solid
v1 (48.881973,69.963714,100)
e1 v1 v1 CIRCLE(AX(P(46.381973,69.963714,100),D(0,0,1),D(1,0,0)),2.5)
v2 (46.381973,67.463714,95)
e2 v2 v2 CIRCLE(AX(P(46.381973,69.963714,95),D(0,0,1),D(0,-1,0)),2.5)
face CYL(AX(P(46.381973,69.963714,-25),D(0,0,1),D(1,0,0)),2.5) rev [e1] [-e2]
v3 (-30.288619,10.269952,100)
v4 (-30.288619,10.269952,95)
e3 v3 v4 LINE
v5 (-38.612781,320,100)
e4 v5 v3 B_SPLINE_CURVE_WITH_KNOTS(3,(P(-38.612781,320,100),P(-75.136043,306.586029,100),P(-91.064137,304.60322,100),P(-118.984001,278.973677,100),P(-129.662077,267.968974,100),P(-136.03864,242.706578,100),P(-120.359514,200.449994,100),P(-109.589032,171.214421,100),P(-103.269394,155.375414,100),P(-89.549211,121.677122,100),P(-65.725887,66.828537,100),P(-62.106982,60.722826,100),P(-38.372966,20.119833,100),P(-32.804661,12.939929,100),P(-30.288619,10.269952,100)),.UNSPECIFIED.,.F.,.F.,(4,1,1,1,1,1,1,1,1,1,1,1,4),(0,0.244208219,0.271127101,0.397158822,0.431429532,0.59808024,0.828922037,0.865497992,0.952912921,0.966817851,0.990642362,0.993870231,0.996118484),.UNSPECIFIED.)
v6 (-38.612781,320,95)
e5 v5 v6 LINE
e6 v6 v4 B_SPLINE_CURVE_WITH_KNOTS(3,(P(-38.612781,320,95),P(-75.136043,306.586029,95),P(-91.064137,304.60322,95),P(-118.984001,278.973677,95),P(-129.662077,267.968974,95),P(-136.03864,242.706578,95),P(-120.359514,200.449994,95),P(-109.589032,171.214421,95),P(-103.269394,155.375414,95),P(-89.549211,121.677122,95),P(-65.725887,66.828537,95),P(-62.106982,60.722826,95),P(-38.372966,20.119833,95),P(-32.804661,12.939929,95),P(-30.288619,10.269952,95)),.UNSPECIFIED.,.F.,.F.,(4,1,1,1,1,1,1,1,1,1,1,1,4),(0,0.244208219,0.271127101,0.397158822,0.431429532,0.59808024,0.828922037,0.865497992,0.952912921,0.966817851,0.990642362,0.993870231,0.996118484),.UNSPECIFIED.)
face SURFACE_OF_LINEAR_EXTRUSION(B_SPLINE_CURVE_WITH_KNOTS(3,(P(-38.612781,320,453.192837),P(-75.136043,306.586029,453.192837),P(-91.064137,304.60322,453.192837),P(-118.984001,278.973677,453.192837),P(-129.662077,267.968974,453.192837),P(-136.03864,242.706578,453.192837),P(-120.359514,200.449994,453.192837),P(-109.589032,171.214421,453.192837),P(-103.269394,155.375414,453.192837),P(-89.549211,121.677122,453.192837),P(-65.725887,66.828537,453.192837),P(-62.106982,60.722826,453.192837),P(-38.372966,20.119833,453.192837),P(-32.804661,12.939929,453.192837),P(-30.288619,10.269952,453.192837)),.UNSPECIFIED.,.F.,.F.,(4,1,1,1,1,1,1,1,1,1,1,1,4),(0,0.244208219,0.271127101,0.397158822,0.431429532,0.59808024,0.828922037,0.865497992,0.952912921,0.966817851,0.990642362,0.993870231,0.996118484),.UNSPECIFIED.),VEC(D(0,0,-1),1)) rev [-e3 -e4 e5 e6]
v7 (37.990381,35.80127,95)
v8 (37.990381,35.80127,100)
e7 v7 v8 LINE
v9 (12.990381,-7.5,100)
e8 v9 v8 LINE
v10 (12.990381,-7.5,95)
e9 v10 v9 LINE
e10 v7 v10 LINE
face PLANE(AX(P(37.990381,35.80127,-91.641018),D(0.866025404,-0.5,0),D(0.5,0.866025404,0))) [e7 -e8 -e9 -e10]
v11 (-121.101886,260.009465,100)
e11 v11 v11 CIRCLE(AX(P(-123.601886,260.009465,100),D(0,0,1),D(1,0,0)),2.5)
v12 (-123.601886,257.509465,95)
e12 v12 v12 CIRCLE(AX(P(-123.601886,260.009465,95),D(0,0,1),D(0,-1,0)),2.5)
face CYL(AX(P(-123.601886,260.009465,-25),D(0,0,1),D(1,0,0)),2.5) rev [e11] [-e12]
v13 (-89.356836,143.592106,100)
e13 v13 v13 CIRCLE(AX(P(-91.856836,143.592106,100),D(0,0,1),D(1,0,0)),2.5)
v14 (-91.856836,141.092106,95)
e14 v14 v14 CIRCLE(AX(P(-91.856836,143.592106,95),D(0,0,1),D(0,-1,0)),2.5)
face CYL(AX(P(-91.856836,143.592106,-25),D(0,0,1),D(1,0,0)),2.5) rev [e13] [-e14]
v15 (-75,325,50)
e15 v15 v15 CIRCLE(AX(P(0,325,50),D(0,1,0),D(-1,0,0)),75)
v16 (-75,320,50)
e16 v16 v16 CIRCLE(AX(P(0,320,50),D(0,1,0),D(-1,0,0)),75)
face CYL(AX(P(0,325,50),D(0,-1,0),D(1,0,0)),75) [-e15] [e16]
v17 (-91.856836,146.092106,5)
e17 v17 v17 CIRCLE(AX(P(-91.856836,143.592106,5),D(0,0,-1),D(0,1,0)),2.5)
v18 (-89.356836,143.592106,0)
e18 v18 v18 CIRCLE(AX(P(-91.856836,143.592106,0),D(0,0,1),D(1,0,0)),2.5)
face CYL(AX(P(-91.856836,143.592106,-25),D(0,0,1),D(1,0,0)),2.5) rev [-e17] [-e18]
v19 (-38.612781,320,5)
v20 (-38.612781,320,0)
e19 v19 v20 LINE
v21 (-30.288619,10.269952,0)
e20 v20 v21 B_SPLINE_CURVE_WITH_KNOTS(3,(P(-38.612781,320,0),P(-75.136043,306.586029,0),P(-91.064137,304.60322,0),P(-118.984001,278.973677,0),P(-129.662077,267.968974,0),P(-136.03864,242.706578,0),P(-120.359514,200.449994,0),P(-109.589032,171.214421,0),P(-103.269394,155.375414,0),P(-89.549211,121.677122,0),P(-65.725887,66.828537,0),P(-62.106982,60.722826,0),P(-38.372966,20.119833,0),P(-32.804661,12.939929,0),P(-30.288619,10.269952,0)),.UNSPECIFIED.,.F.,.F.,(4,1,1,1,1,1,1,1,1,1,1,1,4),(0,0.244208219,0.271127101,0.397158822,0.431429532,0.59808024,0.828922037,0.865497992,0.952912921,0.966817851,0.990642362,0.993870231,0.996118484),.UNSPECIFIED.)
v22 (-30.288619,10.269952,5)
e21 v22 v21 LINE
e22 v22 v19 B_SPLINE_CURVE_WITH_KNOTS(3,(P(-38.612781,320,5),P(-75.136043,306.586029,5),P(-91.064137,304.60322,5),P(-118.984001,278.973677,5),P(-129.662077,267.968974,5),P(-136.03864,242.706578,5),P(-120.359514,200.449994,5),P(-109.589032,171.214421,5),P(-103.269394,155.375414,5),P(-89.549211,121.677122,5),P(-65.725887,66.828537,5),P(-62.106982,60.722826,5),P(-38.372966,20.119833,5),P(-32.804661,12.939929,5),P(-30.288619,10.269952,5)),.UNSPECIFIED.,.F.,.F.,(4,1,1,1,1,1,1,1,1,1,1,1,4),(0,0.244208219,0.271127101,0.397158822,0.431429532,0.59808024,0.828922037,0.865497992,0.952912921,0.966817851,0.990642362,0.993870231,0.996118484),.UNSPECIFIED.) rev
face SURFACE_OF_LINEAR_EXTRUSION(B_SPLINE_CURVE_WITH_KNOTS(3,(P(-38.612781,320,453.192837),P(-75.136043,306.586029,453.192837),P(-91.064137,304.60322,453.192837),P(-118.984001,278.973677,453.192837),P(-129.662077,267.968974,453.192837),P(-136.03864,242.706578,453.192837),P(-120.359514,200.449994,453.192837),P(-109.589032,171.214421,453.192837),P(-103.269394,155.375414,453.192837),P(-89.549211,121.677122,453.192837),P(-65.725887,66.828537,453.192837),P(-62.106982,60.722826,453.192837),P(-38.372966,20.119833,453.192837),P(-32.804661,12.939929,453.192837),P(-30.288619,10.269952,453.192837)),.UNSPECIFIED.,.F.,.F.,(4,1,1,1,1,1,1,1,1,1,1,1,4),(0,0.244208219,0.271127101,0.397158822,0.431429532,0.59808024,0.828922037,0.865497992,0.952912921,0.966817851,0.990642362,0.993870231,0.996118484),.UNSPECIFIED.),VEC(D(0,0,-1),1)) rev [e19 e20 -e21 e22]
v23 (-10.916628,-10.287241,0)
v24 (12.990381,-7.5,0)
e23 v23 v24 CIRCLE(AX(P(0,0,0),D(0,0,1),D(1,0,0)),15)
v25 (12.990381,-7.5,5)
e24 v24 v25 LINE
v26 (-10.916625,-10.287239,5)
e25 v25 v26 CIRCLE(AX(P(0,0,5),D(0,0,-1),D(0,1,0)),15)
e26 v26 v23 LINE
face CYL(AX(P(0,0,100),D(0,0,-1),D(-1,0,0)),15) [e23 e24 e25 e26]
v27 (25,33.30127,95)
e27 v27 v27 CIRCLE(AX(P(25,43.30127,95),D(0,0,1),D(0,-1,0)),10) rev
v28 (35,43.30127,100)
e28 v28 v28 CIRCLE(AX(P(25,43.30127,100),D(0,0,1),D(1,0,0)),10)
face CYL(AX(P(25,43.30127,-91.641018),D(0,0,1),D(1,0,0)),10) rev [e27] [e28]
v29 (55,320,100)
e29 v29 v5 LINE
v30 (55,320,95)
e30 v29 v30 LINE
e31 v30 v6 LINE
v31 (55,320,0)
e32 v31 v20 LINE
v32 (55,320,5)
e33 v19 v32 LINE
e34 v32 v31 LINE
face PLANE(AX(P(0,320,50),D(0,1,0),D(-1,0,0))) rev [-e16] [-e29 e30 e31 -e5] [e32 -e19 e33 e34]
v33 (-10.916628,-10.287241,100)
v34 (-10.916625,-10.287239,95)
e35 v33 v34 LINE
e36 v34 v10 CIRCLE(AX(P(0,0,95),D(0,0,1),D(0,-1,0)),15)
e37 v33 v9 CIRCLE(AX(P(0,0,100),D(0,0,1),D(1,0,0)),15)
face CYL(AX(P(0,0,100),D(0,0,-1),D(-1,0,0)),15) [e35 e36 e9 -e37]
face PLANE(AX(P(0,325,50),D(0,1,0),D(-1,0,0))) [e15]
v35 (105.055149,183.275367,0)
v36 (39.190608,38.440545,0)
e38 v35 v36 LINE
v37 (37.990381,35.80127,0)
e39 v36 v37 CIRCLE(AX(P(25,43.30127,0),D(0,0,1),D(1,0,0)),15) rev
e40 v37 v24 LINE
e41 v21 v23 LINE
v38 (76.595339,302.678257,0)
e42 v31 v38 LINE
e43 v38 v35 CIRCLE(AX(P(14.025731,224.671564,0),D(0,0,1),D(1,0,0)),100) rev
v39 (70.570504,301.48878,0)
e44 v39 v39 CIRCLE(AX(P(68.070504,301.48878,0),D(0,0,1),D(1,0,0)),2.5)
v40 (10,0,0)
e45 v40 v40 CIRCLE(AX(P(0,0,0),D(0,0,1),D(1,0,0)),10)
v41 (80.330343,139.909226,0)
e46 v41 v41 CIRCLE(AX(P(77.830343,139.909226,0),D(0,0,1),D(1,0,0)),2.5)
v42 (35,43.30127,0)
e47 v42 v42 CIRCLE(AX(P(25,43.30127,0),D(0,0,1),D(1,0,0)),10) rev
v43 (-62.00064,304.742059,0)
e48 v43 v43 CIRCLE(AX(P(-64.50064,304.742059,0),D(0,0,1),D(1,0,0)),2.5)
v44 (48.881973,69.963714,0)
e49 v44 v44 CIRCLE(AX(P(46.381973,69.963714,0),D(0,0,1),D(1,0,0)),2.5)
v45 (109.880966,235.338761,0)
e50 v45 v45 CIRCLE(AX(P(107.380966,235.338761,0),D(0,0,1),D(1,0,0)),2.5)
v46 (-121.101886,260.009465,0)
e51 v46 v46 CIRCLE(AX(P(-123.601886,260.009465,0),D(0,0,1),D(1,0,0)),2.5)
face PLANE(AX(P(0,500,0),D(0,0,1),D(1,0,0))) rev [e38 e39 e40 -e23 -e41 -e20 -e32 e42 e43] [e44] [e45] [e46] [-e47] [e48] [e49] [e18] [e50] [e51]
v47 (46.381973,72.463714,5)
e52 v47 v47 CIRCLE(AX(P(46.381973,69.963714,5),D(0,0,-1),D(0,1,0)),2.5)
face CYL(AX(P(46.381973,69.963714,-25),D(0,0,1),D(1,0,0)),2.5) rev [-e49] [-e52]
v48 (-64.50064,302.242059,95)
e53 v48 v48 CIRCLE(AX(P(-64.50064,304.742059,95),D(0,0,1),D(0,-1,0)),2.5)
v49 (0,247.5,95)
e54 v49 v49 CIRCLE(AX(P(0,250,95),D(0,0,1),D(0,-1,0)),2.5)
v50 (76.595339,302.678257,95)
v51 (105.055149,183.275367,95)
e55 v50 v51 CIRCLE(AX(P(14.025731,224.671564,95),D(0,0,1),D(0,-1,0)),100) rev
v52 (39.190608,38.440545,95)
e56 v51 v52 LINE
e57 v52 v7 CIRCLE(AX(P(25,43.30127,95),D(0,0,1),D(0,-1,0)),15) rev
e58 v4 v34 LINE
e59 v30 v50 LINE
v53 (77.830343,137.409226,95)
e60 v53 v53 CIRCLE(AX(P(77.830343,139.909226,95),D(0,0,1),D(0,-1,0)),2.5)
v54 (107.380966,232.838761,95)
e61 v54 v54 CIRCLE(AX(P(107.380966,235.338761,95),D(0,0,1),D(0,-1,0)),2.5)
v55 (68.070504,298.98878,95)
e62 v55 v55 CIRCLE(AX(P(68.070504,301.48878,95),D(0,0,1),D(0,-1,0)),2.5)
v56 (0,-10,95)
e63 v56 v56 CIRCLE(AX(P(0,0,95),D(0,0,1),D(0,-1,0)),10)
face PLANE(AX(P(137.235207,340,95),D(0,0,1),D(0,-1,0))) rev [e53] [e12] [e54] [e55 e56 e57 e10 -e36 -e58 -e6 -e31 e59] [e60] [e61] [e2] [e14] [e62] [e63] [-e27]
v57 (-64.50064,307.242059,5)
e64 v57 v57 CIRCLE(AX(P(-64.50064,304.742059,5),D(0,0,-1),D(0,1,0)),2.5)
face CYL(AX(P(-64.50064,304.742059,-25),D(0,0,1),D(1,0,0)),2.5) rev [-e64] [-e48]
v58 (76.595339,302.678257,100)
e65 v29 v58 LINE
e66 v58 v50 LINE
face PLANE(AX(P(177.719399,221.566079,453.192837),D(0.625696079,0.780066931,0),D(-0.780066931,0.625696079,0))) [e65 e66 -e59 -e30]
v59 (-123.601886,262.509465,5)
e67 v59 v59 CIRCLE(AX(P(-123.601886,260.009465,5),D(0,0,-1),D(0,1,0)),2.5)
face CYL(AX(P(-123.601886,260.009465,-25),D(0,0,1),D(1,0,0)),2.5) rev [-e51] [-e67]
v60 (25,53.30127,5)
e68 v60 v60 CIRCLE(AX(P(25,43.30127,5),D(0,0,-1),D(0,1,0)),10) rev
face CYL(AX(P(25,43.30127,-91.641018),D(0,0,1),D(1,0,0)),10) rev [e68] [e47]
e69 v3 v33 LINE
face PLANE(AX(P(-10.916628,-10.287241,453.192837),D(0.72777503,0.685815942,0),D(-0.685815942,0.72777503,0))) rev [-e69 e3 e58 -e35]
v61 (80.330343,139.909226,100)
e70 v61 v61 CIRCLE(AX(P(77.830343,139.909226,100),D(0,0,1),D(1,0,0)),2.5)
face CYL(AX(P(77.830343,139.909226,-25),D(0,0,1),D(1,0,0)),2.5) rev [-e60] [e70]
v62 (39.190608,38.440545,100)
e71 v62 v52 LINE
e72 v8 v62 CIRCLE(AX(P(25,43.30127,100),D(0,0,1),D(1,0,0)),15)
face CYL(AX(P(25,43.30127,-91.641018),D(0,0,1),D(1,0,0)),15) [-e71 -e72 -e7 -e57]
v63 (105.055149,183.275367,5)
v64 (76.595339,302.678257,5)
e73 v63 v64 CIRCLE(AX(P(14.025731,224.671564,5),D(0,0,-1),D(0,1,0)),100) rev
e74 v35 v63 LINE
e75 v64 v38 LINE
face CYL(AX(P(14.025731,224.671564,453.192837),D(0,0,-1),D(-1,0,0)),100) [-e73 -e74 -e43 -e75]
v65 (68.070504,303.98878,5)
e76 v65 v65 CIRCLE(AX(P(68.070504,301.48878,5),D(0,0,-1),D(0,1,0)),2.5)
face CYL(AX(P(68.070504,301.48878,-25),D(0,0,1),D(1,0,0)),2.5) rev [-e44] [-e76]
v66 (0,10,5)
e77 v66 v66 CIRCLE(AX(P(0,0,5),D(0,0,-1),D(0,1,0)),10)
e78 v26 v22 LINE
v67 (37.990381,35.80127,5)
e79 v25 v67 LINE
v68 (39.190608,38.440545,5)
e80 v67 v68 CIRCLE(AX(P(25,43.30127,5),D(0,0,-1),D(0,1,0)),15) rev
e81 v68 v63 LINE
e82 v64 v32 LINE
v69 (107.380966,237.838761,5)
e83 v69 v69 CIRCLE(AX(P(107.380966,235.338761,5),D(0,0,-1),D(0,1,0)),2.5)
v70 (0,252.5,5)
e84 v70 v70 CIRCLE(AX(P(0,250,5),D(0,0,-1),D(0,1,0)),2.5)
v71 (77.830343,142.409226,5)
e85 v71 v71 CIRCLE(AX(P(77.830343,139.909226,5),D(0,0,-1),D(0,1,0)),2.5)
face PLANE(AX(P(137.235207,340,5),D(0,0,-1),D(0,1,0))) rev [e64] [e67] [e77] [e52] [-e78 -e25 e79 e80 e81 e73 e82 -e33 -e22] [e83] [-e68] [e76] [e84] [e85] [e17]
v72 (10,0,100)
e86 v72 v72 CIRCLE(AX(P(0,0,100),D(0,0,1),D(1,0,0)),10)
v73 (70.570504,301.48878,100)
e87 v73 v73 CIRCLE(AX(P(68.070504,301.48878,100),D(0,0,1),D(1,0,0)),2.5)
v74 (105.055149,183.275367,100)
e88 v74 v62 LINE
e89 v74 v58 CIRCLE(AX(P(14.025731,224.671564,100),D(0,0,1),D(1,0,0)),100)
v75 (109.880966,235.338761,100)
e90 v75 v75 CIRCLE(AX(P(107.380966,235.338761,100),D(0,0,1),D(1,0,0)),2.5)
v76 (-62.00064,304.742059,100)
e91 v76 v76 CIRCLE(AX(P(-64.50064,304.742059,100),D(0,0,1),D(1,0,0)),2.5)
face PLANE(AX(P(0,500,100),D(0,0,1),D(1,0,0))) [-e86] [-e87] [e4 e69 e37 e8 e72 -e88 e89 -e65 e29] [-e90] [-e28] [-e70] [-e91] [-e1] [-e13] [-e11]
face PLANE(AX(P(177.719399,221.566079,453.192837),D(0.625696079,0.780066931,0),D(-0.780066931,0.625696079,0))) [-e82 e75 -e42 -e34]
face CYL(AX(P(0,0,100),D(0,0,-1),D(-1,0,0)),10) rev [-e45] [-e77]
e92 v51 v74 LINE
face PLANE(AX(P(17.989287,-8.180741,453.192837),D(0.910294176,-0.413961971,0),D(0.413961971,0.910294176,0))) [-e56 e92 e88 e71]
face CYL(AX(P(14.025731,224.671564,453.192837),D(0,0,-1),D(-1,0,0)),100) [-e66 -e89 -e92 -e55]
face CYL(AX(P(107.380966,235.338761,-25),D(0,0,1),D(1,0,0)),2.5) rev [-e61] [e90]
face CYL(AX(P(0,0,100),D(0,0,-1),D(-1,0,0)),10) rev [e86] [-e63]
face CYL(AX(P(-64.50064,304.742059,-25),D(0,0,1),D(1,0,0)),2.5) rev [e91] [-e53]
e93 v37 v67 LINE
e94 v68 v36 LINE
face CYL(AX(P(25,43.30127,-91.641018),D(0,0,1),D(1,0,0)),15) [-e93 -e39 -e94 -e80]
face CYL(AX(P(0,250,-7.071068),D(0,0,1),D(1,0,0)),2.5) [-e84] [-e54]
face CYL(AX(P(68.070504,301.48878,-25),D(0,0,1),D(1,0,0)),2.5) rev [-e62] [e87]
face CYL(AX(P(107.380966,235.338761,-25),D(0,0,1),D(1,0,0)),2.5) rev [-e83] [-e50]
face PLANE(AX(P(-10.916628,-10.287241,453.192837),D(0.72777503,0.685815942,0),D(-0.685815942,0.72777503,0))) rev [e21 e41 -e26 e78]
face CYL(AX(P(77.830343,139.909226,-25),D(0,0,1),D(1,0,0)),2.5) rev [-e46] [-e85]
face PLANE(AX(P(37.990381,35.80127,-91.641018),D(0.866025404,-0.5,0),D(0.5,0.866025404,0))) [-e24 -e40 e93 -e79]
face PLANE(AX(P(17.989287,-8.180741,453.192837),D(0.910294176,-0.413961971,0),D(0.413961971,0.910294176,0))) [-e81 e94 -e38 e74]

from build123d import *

# Parameters (mm, degrees)
SKETCH_1_R               = 10
EXTRUDE_1_DEPTH          = 100
EXTRUDE_START            = -100
SKETCH_2_R               = 10
EXTRUDE_2_DEPTH          = 100
EXTRUDE_6_DEPTH          = 100
CUT_EXTRUDE_1_DEPTH      = 547.260522505
CUT_EXTRUDE_1_DEPTH_BACK = 547.260522505
SKETCH_3_W               = 90
SKETCH_3_H               = 380
SKETCH_5_R               = 2.5
EXTRUDE_3_DEPTH          = 100
SKETCH_6_W               = 191.177045066
SKETCH_6_H               = 235.084722287
CUT_EXTRUDE_2_DEPTH      = 84
SKETCH_7_R               = 75
EXTRUDE_4_DEPTH          = 5
FILLET_1_R               = 100
CUT_EXTRUDE_3_DEPTH      = 372.245990354
CUT_EXTRUDE_3_DEPTH_BACK = 372.245990354
SKETCH_9_R               = 2.5


# Read off the part's stored shape, not the designer's step: 凸台-拉伸6
with BuildPart() as part:
    # 草图1 → 凸台-拉伸1 (new body)
    with BuildSketch(Plane.XY):
        with BuildLine():
            Line((-15, 500), (-15, 0))
            ThreePointArc((-15, 0), (0, -15), (15, 0))
            Line((15, 0), (15, 500))
            ThreePointArc((15, 500), (0, 515), (-15, 500))
        make_face()
        with Locations((0, 500)):
            Circle(SKETCH_1_R, mode=Mode.SUBTRACT)
        Circle(SKETCH_1_R, mode=Mode.SUBTRACT)
    extrude(amount=EXTRUDE_1_DEPTH)

    # 草图2 → 凸台-拉伸2 (add)
    with BuildSketch(Plane.XY.offset(100).offset(EXTRUDE_START)):
        with BuildLine():
            Line((15, 58.301270189), (25, 58.301270189))
            ThreePointArc((25, 58.301270189), (37.990381057, 50.801270189), (37.990381057, 35.801270189))
            Line((37.990381057, 35.801270189), (12.990381057, -7.5))
            ThreePointArc((12.990381057, -7.5), (-3.882285677, -14.488887394), (-15, 0))
            Line((-15, 0), (-15, 58.301270189))
            Line((-15, 58.301270189), (15, 58.301270189))
        make_face()
        with Locations((25, 43.301270189)):
            Circle(SKETCH_2_R, mode=Mode.SUBTRACT)
        Circle(SKETCH_2_R, mode=Mode.SUBTRACT)
    extrude(amount=EXTRUDE_2_DEPTH)

    # 凸台-拉伸6 outline → 凸台-拉伸6 (add)
    with BuildSketch(Plane(origin=(0, 0, 0), x_dir=(-1, 0, 0), z_dir=(0, 0, -1)).offset(EXTRUDE_START)):
        with BuildLine():
            add(Edge.make_bspline(
                [(38.612780637, 320), (75.136043423, 306.586029444), (91.064136582, 304.603219665), (118.984001014, 278.973676733), (129.662077412, 267.968974065), (136.038640467, 242.70657755), (120.359514298, 200.44999402), (109.589031887, 171.214421453), (103.269394168, 155.375414082), (89.549210595, 121.677121722), (65.725886592, 66.828536865), (62.106981873, 60.722826423), (38.372965569, 20.119833015), (32.80466093, 12.939929061), (30.288618585, 10.269952061)],
                knots=[0, 0, 0, 0, 0.244208219, 0.271127101, 0.397158822, 0.431429532, 0.59808024, 0.828922037, 0.865497992, 0.952912921, 0.966817851, 0.990642362, 0.993870231, 0.996118484, 0.996118484, 0.996118484, 0.996118484], degree=3))
            Line((38.612780637, 320), (15, 320))
            Line((15, 320), (15, 0))
            ThreePointArc((15, 0), (13.941832406, -5.534013839), (10.916625444, -10.28723913))
            Line((10.916625444, -10.28723913), (30.288618585, 10.269952061))
        make_face()
        with BuildLine():
            Line((-15, 58.301270189), (-15, 320))
            Line((-15, 320), (-55, 320))
            Line((-55, 320), (-137.235207142, 254.038677195))
            Line((-137.235207142, 254.038677195), (-39.190607966, 38.440545392))
            ThreePointArc((-39.190607966, 38.440545392), (-37.204730066, 52.021623624), (-25, 58.301270189))
            Line((-25, 58.301270189), (-15, 58.301270189))
        make_face()
    extrude(amount=EXTRUDE_6_DEPTH)

    # 草图3 → 切除-拉伸1 (cut, two sides: drawn at the far end of the back side and taken through both)
    with BuildSketch(Plane.ZY.offset(15).offset(-CUT_EXTRUDE_1_DEPTH_BACK)):
        with Locations((50, 150)):
            Rectangle(SKETCH_3_W, SKETCH_3_H)
    extrude(amount=CUT_EXTRUDE_1_DEPTH + CUT_EXTRUDE_1_DEPTH_BACK, mode=Mode.SUBTRACT)

    # 草图5 → 凸台-拉伸3 (add)
    with BuildSketch(Plane.XY.offset(100)):
        with Locations(Location((0, 250, 0), (0, 0, 270))):
            Circle(SKETCH_5_R)
    extrude(amount=-EXTRUDE_3_DEPTH)

    # 草图6 → 切除-拉伸2 (cut)
    with BuildSketch(Plane(origin=(15, 0, 0), x_dir=(0, 0, -1), z_dir=(1, 0, 0))):
        with Locations((-50.962374235, 437.542361144)):
            Rectangle(SKETCH_6_W, SKETCH_6_H)
    extrude(amount=-CUT_EXTRUDE_2_DEPTH, mode=Mode.SUBTRACT)

    # 草图7 → 凸台-拉伸4 (add)
    with BuildSketch(Plane(origin=(0, 320, 0), x_dir=(1, 0, 0), z_dir=(0, 1, 0))):
        with Locations(Location((0, -50, 0), (0, 0, 180))):
            Circle(SKETCH_7_R)
    extrude(amount=EXTRUDE_4_DEPTH)

    # 圆角1
    fillet_1_edges = [part.edges().sort_by_distance(p)[0] for p in [
        (137.235207142, 254.038677195, 97.5),
        (137.235207142, 254.038677195, 2.5),
    ]]
    fillet(fillet_1_edges, radius=FILLET_1_R)

    # 草图9 → 切除-拉伸3 (cut, two sides: drawn at the far end of the back side and taken through both)
    with BuildSketch(Plane.XY.offset(5).offset(-CUT_EXTRUDE_3_DEPTH_BACK)):
        with Locations((68.070503846, 301.488779743)):
            Circle(SKETCH_9_R)
        with Locations((77.830342663, 139.909225997)):
            Circle(SKETCH_9_R)
        with Locations((46.381973142, 69.963714477)):
            Circle(SKETCH_9_R)
        with Locations((-91.856835643, 143.592106289)):
            Circle(SKETCH_9_R)
        with Locations((-123.601886252, 260.009464772)):
            Circle(SKETCH_9_R)
        with Locations((-64.500640083, 304.742059349)):
            Circle(SKETCH_9_R)
        with Locations((107.380965747, 235.338761096)):
            Circle(SKETCH_9_R)
    extrude(amount=CUT_EXTRUDE_3_DEPTH + CUT_EXTRUDE_3_DEPTH_BACK, mode=Mode.SUBTRACT)


solid = part.part
